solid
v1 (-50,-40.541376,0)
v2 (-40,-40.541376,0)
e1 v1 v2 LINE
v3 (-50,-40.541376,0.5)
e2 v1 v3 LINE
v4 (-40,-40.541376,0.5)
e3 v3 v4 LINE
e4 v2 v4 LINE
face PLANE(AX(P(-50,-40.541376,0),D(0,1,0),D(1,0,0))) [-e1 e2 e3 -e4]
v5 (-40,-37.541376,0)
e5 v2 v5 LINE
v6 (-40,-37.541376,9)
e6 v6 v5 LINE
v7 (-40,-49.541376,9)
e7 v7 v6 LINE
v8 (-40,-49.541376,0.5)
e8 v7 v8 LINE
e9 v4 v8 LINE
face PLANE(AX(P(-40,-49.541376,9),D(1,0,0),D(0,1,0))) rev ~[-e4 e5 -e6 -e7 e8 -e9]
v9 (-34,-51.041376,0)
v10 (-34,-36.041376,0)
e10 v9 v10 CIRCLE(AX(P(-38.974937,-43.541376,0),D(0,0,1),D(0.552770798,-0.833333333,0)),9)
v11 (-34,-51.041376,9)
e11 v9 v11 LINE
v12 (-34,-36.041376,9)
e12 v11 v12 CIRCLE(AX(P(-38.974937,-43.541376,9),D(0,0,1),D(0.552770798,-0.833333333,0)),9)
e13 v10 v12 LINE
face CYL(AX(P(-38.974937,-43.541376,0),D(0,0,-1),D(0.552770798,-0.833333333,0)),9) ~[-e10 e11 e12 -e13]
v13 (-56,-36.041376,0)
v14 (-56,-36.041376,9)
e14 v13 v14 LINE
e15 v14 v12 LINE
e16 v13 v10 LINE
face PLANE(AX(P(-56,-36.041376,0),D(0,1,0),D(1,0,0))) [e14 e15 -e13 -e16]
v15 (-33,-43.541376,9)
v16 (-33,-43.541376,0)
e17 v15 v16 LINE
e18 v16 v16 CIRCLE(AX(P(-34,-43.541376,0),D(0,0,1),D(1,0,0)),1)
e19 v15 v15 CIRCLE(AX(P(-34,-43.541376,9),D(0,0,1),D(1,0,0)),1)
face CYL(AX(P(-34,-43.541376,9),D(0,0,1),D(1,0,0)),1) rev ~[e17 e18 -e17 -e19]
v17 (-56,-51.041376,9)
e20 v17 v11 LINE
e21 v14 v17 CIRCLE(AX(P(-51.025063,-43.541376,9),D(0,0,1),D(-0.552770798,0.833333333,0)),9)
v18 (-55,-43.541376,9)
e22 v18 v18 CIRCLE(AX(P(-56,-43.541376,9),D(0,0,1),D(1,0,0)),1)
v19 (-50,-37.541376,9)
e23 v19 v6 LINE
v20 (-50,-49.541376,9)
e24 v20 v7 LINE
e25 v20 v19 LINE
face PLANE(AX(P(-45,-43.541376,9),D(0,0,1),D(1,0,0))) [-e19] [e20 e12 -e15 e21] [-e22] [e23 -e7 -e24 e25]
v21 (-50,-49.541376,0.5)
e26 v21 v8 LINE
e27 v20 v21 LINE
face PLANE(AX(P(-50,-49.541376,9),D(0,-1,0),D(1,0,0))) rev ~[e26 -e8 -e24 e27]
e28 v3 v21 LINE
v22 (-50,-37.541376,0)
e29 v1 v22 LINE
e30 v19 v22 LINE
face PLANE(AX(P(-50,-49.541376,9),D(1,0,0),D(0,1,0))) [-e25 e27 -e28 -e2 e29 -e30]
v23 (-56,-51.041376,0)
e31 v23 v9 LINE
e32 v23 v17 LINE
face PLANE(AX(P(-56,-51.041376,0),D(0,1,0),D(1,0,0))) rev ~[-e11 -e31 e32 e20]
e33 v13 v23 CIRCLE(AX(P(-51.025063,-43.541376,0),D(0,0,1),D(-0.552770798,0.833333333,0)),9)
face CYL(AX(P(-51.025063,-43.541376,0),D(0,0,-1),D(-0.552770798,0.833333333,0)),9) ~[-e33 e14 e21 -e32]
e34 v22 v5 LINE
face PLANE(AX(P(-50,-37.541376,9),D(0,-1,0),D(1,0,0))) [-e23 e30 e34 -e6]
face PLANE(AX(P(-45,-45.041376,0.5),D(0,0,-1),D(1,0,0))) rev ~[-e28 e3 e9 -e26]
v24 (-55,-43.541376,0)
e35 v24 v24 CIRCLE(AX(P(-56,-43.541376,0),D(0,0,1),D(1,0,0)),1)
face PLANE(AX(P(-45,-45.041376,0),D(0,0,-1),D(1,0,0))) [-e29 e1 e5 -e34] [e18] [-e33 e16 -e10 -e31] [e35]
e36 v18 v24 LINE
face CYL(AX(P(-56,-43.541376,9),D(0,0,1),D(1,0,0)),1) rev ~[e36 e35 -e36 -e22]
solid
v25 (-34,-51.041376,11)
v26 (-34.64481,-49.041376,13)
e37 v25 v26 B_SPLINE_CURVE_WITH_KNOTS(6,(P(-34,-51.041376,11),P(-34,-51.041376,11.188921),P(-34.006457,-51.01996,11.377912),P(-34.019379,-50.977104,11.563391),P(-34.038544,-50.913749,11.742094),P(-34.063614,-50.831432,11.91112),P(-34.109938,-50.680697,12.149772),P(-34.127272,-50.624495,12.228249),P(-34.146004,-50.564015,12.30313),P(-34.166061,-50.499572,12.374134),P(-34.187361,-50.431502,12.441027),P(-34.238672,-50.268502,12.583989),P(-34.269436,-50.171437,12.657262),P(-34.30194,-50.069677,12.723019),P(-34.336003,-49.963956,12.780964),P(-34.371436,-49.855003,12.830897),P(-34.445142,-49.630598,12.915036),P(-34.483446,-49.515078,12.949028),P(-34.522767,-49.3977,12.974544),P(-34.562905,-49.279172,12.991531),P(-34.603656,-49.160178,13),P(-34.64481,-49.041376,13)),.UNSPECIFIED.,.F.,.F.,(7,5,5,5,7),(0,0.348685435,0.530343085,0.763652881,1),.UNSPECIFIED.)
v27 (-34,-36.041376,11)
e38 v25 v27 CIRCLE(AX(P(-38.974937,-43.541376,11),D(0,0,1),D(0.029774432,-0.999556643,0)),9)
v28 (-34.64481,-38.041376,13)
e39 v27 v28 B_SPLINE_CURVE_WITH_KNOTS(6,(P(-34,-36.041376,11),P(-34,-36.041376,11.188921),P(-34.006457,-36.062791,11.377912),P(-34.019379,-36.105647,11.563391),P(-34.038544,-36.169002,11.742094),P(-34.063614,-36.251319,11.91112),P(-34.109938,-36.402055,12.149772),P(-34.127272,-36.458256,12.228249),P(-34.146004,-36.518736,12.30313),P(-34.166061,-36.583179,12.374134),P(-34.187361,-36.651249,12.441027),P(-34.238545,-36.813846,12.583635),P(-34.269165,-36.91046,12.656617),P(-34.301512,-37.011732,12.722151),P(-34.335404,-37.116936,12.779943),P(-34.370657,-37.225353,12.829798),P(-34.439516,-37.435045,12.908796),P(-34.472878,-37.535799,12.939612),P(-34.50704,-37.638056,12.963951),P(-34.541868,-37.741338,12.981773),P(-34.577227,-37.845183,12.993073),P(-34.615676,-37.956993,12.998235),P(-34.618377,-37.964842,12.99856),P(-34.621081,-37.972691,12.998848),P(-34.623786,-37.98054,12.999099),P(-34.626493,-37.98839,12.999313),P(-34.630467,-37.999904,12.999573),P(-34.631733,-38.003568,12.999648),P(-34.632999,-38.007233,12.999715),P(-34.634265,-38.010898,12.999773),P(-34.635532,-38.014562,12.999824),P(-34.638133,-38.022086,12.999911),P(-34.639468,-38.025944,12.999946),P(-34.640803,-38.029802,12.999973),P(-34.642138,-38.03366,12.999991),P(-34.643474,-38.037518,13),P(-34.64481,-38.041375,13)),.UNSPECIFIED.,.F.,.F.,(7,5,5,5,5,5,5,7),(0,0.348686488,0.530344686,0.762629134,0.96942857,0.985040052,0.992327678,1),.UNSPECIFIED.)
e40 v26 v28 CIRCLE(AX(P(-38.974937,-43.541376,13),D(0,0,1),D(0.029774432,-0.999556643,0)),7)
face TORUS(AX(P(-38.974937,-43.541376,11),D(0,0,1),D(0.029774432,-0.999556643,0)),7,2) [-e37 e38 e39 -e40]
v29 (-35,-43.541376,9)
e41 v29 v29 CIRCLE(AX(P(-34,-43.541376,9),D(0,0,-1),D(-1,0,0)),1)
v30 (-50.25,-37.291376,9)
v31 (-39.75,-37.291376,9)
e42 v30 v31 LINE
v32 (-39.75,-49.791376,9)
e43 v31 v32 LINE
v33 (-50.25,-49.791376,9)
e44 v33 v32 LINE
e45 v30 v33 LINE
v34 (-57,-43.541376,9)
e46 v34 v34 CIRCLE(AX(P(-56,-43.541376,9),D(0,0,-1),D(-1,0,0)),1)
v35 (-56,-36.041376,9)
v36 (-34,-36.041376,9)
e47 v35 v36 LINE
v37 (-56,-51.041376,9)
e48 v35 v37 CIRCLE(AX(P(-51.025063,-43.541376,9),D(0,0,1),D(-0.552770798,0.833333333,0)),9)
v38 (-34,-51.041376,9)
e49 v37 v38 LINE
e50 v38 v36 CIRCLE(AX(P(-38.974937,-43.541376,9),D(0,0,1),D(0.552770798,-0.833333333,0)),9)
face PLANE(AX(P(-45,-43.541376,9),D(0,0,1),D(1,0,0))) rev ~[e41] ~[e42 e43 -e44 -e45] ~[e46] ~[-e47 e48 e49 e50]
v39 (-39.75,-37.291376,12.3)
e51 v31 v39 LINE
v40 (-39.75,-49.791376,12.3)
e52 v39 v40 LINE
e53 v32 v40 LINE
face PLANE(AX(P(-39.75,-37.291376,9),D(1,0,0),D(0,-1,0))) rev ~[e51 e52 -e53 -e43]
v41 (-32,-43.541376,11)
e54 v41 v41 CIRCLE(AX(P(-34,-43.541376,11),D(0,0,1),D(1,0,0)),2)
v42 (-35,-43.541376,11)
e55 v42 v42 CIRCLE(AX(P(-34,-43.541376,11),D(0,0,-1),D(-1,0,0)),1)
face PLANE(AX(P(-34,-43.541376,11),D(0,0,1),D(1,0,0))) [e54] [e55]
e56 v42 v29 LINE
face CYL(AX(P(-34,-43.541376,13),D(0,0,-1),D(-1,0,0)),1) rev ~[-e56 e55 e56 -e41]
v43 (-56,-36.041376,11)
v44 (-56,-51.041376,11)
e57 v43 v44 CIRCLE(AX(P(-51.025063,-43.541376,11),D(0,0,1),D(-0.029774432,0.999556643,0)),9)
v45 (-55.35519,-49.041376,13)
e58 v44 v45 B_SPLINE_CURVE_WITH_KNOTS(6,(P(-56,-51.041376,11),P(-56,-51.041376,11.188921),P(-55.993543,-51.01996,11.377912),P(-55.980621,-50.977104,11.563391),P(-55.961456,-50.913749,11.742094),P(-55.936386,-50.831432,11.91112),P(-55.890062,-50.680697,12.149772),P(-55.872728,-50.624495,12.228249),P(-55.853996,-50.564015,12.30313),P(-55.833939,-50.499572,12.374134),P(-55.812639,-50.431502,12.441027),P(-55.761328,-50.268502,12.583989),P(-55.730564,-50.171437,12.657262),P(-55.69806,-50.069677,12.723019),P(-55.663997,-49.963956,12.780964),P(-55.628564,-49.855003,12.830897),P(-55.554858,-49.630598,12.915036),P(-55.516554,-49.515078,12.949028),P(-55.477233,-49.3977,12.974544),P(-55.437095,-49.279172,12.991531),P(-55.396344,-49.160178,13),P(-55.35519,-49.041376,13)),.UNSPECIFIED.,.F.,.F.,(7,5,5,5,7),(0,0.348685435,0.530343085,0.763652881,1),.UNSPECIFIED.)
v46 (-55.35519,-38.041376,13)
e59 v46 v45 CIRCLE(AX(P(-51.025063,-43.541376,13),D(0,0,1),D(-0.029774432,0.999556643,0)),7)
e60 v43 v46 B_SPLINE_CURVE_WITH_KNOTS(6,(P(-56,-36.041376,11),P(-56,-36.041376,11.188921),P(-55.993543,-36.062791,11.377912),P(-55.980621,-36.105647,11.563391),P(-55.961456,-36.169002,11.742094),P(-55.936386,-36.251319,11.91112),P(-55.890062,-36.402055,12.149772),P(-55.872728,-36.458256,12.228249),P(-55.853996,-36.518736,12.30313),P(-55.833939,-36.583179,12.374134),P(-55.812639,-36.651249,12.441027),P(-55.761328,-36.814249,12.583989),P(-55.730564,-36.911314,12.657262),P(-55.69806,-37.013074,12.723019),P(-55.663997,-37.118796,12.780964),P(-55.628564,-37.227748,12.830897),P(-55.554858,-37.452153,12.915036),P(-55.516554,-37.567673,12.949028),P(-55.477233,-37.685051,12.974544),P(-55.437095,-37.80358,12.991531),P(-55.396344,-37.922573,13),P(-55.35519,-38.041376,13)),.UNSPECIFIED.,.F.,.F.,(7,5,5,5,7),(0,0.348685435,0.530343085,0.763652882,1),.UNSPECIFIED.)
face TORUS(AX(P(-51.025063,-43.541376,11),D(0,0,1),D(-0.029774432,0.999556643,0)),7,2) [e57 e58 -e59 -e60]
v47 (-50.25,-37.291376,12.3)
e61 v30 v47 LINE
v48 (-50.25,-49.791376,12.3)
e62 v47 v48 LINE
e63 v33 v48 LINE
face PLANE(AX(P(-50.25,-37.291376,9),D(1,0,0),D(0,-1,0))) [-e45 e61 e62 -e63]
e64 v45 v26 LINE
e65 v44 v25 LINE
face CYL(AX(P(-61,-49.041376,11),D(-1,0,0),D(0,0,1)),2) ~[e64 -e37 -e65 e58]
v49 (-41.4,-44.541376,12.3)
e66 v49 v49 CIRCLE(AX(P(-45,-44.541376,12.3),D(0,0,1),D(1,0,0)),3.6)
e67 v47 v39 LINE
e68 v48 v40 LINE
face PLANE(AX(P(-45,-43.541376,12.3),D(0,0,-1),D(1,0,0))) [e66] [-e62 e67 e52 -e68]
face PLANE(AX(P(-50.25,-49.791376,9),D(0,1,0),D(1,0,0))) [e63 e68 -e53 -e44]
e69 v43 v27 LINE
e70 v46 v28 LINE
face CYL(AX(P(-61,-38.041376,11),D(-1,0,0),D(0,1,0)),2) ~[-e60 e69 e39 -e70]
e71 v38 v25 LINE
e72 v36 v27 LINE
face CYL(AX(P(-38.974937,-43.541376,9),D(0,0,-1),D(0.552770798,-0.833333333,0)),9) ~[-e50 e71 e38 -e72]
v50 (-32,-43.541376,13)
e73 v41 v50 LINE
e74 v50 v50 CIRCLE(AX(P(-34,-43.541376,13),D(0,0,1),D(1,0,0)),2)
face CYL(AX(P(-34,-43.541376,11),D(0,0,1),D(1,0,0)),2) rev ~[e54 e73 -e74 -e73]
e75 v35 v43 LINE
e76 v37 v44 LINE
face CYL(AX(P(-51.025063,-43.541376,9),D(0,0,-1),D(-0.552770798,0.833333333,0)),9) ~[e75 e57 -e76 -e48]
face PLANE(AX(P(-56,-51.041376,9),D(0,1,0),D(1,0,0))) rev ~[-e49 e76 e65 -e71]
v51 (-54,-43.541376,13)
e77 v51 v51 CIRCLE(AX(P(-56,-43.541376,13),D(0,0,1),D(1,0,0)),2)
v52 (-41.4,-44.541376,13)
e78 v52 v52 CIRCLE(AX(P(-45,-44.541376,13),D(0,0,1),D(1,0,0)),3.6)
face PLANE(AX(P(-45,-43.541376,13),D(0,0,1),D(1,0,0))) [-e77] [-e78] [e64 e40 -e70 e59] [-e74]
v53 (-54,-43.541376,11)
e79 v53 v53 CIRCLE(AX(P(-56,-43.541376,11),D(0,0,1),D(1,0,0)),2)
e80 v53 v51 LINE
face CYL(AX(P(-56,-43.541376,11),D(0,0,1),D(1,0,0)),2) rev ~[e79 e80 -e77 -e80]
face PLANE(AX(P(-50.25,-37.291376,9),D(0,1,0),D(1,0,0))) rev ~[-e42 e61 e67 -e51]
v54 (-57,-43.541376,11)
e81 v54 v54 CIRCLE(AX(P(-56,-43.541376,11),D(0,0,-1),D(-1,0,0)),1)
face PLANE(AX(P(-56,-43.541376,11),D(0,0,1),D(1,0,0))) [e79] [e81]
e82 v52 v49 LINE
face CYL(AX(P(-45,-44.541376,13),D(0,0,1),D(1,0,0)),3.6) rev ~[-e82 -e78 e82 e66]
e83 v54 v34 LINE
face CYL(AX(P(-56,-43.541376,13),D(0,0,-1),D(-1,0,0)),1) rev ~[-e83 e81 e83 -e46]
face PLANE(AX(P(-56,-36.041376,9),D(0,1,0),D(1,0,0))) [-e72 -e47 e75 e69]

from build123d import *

# Parameters (mm, degrees)
F0_W            = 22
F0_H            = 15
F1_DEPTH        = 9
F2_R            = 1
F2_W            = 10
F2_H            = 12
F3_DEPTH        = 9
F4_W            = 10
F4_H            = 9
F5_DEPTH        = 0.5
F6_W            = 22
F6_H            = 15
F7_DEPTH        = 4
F8_R            = 3.6
F9_DEPTH        = 4
F10_T1_DEPTH    = 32
F10_T4_ANGLE    = 176.5875970816
F10_T6_ANGLE    = 176.5875970816
F11_D           = 2
F11_DEPTH       = 20
F11_CBORE_D     = 4
F11_CBORE_DEPTH = 2
F11_TIP         = 0.600860619
F12_W           = 10.5
F12_H           = 12.5
F13_DEPTH       = 3.3


# Not quite as in the source:
# - a fillet or chamfer that OpenCascade refuses, or shapes differently, is made with other operations: its cross-section is extruded or revolved along the edge and cut away or added


with BuildPart() as f1:
    # F0 (on Top) → F1 (new body)
    with BuildSketch(Plane.XY):
        with Locations((-45, -43.5413755476)):
            Rectangle(F0_W, F0_H)
        with BuildLine():
            ThreePointArc((-34, -51.0413755476), (-29.9749371855, -43.5413755476), (-34, -36.0413755476))
            Line((-34, -36.0413755476), (-34, -51.0413755476))
        make_face()
        with BuildLine():
            Line((-56, -51.0413755476), (-56, -36.0413755476))
            ThreePointArc((-56, -36.0413755476), (-60.0250628145, -43.5413755476), (-56, -51.0413755476))
        make_face()
    extrude(amount=F1_DEPTH)

    # F2 (on face) → F3 (cut)
    with BuildSketch(Plane.XY.offset(9)):
        with Locations((-56, -43.5413755476)):
            Circle(F2_R)
        with Locations((-34, -43.5413755476)):
            Circle(F2_R)
        with Locations((-45, -43.5413755476)):
            Rectangle(F2_W, F2_H)
    extrude(amount=-F3_DEPTH, mode=Mode.SUBTRACT)

    # F4 (on face) → F5 (join)
    with BuildSketch(Plane(origin=(0, 0, 0), x_dir=(1, 0, 0), z_dir=(0, 0, -1))):
        with Locations((-45, 45.0413755476)):
            Rectangle(F4_W, F4_H)
    extrude(amount=-F5_DEPTH)


with BuildPart() as f7:
    # F6 (on face) → F7 (new body)
    with BuildSketch(Plane.XY.offset(9)):
        with Locations((-45, -43.5413755476)):
            Rectangle(F6_W, F6_H)
        with BuildLine():
            ThreePointArc((-34, -51.0413755476), (-29.9749371855, -43.5413755476), (-34, -36.0413755476))
            Line((-34, -36.0413755476), (-34, -51.0413755476))
        make_face()
        with BuildLine():
            Line((-56, -51.0413755476), (-56, -36.0413755476))
            ThreePointArc((-56, -36.0413755476), (-60.0250628145, -43.5413755476), (-56, -51.0413755476))
        make_face()
    extrude(amount=F7_DEPTH)

    # F8 (on face) → F9 (cut)
    with BuildSketch(Plane.XY.offset(13)):
        with Locations((-45, -44.5413755476)):
            Circle(F8_R)
    extrude(amount=-F9_DEPTH, mode=Mode.SUBTRACT)

    # F10: fillet of radius 2 on 4 edges, made by hand

    # F10_s2 → F10_t1 (cut)
    with BuildSketch(Plane.YZ.offset(-61)):
        with BuildLine():
            ThreePointArc((-36.0413755476, 11), (-36.6271619853, 12.4142135624), (-38.0413755476, 13))
            Line((-38.0413755476, 13), (-36.0413755476, 13))
            Line((-36.0413755476, 13), (-36.0413755476, 11))
        make_face()
        with BuildLine():
            ThreePointArc((-49.0413755476, 13), (-50.45558911, 12.4142135624), (-51.0413755476, 11))
            Line((-51.0413755476, 11), (-51.0413755476, 13))
            Line((-51.0413755476, 13), (-49.0413755476, 13))
        make_face()
    extrude(amount=F10_T1_DEPTH, mode=Mode.SUBTRACT)

    # F10_s3 → F10_t4 (revolve, cut)
    with BuildSketch(Plane(origin=(-40.2362302043, -1.1985422881, 0), x_dir=(0, 0, 1), z_dir=(-0.9995566433, -0.0297744322, 0))):
        with BuildLine():
            ThreePointArc((11, -51.3616145647), (12.4142135624, -50.7758281271), (13, -49.3616145647))
            Line((13, -49.3616145647), (13, -51.3616145647))
            Line((13, -51.3616145647), (11, -51.3616145647))
        make_face()
    revolve(axis=Axis((-38.9749371855, -43.5413755476, 13), (0, 0, 1)), revolution_arc=F10_T4_ANGLE, mode=Mode.SUBTRACT)

    # F10_s5 → F10_t6 (revolve, cut)
    with BuildSketch(Plane(origin=(-52.2756731943, -1.557168866, 0), x_dir=(0, 0, 1), z_dir=(0.9995566433, 0.0297744322, 0))):
        with BuildLine():
            ThreePointArc((11, 33.0028289167), (12.4142135624, 33.5886153543), (13, 35.0028289167))
            Line((13, 35.0028289167), (13, 33.0028289167))
            Line((13, 33.0028289167), (11, 33.0028289167))
        make_face()
    revolve(axis=Axis((-51.0250628145, -43.5413755476, 13), (0, 0, 1)), revolution_arc=F10_T6_ANGLE, mode=Mode.SUBTRACT)

    # F11
    with Locations(Plane.XY.offset(13)):
        with Locations((-34, -43.5413755476), (-56, -43.5413755476)):
            CounterBoreHole(F11_D / 2, F11_CBORE_D / 2, F11_CBORE_DEPTH, depth=F11_DEPTH)
            with Locations((0, 0, -(F11_DEPTH + F11_TIP / 2))):  # 118° drill point
                Cone(0, F11_D / 2, F11_TIP, mode=Mode.SUBTRACT)

    # F12 (on face) → F13 (cut)
    with BuildSketch(Plane(origin=(0, 0, 9), x_dir=(1, 0, 0), z_dir=(0, 0, -1))):
        with Locations((-45, 43.5413755476)):
            Rectangle(F12_W, F12_H)
    extrude(amount=-F13_DEPTH, mode=Mode.SUBTRACT)


solid = Compound([f1.part, f7.part])
